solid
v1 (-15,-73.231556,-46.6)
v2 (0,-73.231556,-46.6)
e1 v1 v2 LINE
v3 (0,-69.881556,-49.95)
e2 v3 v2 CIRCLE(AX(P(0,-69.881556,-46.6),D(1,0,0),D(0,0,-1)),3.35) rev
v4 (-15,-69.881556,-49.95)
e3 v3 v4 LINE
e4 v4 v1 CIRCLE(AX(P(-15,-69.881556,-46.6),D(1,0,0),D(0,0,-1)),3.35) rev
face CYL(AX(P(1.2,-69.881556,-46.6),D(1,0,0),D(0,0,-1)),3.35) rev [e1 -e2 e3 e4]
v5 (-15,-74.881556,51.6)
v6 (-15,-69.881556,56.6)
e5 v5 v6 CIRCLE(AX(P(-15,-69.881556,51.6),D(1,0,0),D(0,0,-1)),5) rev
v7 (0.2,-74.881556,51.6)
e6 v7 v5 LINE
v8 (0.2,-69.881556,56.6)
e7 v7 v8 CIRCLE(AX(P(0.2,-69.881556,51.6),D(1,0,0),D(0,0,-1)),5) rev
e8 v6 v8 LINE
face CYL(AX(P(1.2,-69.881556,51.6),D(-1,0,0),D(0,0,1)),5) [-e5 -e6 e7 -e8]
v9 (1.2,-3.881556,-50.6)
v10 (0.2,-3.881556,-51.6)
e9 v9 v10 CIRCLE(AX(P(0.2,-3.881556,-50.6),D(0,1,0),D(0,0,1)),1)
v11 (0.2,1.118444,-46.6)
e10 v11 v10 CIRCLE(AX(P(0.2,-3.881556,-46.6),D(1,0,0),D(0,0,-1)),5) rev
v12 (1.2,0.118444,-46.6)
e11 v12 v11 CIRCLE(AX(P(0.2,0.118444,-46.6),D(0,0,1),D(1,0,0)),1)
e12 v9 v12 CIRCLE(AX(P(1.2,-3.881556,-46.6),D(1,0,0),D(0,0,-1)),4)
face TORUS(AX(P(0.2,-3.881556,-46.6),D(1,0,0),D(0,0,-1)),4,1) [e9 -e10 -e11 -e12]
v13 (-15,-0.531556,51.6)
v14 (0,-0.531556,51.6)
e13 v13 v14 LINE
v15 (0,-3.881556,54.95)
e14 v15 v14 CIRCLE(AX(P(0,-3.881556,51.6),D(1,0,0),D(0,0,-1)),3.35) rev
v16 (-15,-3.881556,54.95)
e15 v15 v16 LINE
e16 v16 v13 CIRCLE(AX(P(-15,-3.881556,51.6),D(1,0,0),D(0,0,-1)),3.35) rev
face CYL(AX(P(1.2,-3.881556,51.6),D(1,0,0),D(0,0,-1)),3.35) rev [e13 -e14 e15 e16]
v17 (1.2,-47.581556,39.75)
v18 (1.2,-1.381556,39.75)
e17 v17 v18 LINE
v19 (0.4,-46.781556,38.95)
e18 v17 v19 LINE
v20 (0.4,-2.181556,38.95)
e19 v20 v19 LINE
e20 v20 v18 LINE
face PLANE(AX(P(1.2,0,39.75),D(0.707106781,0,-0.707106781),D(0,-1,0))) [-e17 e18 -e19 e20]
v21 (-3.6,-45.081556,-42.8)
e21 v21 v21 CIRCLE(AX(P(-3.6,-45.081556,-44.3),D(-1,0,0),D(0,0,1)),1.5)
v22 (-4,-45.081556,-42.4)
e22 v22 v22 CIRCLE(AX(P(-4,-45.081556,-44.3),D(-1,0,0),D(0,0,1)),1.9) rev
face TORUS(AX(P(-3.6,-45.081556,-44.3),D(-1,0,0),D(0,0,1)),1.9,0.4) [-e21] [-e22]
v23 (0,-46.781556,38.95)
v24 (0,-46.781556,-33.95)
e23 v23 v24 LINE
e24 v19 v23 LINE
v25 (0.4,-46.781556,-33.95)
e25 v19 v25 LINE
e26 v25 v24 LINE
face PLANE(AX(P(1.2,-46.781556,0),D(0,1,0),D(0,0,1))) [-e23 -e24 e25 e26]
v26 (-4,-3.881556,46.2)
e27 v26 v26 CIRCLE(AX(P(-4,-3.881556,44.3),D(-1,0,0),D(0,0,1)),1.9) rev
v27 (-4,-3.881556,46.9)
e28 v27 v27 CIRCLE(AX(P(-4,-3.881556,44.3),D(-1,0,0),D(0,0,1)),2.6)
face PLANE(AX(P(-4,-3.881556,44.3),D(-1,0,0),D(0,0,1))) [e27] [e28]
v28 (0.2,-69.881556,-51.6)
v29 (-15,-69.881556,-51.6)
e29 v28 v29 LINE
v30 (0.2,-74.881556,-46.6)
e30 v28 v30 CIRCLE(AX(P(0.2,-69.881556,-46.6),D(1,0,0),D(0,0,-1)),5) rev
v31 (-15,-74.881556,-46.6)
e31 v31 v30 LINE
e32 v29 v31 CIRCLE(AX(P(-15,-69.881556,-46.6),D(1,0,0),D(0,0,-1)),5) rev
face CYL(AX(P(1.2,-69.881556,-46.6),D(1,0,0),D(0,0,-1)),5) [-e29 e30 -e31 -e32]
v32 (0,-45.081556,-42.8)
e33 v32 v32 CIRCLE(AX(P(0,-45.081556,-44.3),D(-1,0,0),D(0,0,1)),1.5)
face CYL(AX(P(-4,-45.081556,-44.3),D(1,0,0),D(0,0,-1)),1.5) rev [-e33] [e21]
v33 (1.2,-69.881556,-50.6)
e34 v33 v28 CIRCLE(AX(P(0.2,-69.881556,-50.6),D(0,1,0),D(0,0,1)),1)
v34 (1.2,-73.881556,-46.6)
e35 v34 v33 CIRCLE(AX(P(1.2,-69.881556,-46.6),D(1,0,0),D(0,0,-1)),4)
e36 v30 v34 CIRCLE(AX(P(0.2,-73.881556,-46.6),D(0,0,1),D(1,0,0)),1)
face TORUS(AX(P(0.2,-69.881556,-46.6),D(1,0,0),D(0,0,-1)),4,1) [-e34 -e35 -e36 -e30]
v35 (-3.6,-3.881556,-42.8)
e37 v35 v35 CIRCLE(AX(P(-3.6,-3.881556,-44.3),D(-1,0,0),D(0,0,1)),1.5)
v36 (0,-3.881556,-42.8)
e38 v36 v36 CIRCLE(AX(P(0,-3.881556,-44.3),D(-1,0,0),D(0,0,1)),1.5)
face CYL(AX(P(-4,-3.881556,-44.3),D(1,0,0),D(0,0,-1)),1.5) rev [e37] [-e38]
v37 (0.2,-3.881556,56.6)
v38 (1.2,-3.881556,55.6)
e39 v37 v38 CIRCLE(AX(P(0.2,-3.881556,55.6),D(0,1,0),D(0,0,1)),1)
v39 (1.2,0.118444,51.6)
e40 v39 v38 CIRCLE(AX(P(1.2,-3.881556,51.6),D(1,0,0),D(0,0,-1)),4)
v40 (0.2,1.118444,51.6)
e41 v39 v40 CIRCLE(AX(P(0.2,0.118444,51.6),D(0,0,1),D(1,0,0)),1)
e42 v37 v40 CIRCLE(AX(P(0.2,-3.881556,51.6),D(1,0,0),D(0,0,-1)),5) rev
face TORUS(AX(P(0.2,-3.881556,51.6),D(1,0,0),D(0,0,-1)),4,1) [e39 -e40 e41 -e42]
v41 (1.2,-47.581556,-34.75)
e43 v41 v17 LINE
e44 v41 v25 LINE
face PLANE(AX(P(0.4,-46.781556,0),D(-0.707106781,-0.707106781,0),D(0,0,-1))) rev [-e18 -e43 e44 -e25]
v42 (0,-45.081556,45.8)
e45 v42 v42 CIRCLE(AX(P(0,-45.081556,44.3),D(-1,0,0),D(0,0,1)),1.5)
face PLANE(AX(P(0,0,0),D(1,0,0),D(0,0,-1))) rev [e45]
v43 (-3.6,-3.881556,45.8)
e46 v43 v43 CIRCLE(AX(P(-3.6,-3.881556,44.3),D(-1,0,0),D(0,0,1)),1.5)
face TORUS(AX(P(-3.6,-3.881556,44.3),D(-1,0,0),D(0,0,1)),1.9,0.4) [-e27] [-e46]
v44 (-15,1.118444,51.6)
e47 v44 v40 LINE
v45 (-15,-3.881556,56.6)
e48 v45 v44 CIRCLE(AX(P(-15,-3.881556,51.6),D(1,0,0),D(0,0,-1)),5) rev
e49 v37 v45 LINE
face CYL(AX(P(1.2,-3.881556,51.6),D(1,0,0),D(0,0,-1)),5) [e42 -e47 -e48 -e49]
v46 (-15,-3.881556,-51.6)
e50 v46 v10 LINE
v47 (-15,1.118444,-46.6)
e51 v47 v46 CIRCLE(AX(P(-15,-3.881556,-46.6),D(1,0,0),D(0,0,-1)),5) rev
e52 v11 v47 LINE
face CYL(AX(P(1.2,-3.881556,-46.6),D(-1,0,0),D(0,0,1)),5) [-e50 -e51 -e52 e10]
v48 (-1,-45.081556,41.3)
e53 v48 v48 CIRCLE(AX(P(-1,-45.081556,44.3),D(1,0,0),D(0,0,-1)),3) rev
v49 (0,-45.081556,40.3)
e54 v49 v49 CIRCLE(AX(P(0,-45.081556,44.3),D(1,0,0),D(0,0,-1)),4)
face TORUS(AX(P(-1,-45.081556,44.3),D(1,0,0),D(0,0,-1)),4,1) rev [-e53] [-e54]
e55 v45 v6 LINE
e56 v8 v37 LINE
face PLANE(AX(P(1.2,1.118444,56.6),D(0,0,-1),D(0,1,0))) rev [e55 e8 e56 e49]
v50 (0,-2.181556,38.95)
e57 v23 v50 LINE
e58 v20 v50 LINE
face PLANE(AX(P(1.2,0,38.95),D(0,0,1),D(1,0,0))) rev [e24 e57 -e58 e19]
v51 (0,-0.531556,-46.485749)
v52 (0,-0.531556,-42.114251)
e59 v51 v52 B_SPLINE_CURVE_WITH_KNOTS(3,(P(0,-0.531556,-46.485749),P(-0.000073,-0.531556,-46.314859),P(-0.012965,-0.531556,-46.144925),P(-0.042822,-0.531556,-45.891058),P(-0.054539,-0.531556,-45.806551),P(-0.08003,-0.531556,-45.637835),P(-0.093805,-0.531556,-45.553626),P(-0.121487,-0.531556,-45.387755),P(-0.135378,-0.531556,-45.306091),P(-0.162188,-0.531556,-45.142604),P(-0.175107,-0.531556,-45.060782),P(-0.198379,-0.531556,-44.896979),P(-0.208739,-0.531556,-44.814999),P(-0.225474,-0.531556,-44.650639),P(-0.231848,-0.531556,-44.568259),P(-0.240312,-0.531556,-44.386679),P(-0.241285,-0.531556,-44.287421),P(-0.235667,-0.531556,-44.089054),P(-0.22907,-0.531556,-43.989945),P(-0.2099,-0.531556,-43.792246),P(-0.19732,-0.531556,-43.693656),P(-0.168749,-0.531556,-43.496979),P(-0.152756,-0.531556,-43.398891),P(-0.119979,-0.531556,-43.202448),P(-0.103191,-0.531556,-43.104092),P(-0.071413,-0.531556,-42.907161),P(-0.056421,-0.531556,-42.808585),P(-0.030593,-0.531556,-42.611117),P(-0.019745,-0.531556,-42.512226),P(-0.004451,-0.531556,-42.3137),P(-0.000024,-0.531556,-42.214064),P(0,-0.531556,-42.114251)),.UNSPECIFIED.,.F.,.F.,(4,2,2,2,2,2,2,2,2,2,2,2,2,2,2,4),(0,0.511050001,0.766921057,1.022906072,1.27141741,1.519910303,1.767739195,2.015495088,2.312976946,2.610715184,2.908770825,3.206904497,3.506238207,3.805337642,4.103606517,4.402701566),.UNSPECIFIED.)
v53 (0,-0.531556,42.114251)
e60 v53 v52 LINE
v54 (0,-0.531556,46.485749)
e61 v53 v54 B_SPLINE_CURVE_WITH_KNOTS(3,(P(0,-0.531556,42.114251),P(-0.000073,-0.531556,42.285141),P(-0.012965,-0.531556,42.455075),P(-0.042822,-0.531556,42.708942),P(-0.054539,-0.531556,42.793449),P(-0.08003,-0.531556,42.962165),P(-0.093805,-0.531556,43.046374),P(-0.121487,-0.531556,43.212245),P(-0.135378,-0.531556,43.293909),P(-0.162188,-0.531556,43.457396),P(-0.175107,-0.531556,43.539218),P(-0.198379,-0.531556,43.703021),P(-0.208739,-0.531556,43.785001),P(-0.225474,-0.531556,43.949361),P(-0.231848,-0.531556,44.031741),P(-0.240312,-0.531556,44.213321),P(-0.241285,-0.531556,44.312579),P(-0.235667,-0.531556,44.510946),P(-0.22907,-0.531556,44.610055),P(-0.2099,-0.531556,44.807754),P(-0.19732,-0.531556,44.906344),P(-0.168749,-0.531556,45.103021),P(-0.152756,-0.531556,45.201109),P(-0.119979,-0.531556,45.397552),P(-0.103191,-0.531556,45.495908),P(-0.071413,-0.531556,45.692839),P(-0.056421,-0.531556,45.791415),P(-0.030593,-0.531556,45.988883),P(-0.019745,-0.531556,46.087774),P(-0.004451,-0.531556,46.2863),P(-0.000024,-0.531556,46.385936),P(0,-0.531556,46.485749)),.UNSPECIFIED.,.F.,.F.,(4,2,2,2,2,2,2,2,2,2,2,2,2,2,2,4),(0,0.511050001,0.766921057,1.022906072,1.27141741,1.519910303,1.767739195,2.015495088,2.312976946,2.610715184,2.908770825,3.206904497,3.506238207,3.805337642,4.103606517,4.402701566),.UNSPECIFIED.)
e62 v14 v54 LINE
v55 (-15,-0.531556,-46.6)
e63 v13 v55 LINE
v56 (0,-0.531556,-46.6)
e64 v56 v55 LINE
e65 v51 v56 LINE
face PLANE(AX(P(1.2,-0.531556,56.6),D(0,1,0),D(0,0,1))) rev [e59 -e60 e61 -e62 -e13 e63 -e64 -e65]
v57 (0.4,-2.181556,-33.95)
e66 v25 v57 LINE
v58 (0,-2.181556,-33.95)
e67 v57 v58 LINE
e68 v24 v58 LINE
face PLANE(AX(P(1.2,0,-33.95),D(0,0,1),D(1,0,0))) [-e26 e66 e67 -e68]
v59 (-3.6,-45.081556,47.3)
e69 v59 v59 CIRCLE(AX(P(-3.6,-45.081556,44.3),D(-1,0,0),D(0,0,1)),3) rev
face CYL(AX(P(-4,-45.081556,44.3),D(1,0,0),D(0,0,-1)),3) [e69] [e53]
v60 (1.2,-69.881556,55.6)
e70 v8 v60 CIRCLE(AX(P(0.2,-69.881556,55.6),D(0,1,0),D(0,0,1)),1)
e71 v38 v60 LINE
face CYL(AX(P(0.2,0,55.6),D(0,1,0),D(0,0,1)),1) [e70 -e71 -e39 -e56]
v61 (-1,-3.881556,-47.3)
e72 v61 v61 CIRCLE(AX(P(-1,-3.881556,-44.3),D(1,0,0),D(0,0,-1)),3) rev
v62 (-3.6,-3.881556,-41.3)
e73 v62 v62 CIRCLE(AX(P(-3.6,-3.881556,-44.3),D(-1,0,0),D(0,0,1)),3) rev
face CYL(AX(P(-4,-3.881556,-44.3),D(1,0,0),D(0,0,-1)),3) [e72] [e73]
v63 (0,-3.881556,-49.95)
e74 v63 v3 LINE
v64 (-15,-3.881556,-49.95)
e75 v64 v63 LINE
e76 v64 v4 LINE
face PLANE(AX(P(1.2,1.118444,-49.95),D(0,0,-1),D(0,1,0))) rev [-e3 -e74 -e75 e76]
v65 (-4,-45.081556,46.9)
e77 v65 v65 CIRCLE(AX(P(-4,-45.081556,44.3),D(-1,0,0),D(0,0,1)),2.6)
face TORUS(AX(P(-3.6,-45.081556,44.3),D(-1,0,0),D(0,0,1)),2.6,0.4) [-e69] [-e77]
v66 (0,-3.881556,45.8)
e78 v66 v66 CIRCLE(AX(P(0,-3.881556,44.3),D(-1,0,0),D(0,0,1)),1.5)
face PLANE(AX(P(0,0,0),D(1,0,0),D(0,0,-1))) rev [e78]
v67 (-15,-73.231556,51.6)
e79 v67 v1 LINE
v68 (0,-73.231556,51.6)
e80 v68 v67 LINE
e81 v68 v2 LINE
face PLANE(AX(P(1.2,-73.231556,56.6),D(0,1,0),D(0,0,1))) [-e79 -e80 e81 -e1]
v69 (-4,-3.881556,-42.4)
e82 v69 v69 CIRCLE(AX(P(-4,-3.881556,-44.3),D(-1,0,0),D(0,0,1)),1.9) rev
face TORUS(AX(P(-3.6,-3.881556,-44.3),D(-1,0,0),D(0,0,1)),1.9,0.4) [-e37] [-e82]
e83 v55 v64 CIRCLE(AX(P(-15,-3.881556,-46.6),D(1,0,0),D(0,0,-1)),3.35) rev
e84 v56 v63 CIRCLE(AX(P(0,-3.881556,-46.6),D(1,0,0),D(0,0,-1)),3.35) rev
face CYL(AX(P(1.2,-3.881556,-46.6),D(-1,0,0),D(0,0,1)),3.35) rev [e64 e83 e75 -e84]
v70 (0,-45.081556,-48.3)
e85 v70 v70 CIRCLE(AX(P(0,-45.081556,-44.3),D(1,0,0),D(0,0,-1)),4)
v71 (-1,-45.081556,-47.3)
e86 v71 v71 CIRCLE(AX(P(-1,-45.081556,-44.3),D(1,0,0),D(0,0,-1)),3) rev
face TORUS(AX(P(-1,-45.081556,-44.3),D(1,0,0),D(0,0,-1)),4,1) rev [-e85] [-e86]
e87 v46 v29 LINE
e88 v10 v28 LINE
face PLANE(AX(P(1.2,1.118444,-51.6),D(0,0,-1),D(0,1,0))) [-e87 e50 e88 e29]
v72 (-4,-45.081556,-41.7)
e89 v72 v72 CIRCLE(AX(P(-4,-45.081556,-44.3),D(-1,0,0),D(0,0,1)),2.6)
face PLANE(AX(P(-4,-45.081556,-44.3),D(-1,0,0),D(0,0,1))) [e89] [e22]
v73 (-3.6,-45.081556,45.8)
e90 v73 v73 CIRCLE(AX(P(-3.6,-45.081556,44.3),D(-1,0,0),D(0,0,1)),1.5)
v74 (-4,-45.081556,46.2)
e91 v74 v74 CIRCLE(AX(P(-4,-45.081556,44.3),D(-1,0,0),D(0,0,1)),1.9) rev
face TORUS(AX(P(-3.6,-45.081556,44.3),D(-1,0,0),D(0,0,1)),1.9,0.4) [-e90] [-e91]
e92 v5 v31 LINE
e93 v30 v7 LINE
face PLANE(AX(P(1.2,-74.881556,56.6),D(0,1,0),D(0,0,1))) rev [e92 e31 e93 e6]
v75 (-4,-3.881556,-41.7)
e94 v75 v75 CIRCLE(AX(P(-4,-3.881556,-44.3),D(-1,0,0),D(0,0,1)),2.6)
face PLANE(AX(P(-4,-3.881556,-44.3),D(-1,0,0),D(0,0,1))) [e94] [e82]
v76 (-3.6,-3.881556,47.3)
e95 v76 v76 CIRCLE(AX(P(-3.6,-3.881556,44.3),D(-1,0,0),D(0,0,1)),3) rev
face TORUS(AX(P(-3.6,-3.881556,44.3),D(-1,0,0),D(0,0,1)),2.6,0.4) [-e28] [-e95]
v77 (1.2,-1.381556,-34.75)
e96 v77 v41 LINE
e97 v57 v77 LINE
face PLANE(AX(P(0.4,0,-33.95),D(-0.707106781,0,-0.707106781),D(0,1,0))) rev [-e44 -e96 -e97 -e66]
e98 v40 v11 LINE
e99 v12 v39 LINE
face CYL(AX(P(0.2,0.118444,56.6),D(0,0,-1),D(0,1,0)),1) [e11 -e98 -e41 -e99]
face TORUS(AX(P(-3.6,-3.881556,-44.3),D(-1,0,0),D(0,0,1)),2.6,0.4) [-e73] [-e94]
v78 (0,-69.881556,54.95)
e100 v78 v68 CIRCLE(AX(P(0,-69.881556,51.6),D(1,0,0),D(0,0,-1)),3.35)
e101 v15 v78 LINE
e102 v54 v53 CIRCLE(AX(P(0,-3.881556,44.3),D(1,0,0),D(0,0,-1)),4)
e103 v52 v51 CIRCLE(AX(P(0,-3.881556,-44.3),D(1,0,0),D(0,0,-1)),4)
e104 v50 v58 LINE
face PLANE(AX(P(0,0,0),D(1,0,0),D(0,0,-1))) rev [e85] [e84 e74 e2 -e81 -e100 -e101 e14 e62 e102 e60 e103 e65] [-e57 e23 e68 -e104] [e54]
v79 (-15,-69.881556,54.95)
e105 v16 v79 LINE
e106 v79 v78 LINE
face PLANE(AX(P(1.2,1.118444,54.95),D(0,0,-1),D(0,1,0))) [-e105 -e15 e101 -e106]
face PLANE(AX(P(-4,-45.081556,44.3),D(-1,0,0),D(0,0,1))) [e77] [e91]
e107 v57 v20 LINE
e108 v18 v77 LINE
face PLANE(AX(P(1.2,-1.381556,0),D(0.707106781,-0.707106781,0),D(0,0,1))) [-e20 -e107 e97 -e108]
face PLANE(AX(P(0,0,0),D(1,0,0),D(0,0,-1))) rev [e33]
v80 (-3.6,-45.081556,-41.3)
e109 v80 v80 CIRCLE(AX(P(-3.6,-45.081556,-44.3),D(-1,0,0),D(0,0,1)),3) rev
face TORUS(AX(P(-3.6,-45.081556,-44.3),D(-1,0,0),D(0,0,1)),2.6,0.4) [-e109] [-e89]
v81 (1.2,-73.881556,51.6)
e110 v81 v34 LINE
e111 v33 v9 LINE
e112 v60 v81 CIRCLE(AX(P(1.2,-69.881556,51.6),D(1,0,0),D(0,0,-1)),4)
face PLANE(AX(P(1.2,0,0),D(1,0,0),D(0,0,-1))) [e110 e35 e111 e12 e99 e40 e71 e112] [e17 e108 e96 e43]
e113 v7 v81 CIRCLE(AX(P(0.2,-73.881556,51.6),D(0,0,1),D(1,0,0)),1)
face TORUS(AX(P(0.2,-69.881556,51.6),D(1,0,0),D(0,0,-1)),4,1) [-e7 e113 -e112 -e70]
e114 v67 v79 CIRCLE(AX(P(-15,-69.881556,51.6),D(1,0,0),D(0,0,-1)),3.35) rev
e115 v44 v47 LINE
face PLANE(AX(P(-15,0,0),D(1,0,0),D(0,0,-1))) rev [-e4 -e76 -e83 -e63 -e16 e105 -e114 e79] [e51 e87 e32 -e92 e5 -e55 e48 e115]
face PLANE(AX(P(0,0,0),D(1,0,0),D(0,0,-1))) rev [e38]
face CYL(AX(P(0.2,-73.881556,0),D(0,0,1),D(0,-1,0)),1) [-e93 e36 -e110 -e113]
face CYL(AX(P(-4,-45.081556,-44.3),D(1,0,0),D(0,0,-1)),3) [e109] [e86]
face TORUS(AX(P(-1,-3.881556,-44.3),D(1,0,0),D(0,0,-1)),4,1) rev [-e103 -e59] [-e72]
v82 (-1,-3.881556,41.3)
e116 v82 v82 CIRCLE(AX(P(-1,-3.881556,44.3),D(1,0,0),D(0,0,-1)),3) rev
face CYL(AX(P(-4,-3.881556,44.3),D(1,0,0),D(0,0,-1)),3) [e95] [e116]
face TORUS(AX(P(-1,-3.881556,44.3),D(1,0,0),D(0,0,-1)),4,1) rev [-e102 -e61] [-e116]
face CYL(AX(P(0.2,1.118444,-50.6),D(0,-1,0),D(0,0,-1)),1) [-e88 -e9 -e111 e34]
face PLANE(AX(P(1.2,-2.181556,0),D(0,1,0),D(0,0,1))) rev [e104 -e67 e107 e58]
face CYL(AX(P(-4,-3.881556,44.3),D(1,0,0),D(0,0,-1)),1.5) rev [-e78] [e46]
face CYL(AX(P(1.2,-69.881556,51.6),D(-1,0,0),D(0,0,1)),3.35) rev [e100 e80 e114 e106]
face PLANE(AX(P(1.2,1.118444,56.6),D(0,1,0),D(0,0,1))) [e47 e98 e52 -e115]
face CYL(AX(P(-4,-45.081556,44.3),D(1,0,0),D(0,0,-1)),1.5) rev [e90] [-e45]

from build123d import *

# Parameters (mm, degrees)
BOSS_EXTRUDE1_DEPTH      = 1.2
BOSS_EXTRUDE1_DEPTH_BACK = 15
SKETCH2_W                = 76
SKETCH2_H                = 108.2
FILLET1_R                = 5
FILLET2_R                = 1
SHELL1_T                 = -1.65
SHELL1_THICKNESS_2_DEPTH = 0.45
SKETCH2_3_W              = 44.6
SKETCH2_3_H              = 72.9
CUT_EXTRUDE1_DEPTH       = 96.056864098
CHAMFER1_SIZE            = 0.8
SKETCH3_R                = 3
SKETCH3_R_2              = 1.5
BOSS_EXTRUDE2_DEPTH      = 4
FILLET3_R                = 1
FILLET4_R                = 0.4


with BuildPart() as part:
    # Sketch2 → Boss-Extrude1 (new, two sides: drawn at the far end of the back side and taken through both)
    with BuildSketch(Plane.YZ.offset(-BOSS_EXTRUDE1_DEPTH_BACK)):
        with Locations((-36.881555812, 2.5)):
            Rectangle(SKETCH2_W, SKETCH2_H)
    extrude(amount=BOSS_EXTRUDE1_DEPTH + BOSS_EXTRUDE1_DEPTH_BACK)

    # Fillet1
    fillet1_edges = [part.edges().sort_by_distance(p)[0] for p in [
        (-6.9, 1.118444188, -51.6),
        (-6.9, 1.118444188, 56.6),
        (-6.9, -74.881555812, 56.6),
        (-6.9, -74.881555812, -51.6),
    ]]
    fillet(fillet1_edges, radius=FILLET1_R)

    # Fillet2
    fillet2_edges = [part.edges().sort_by_distance(p)[0] for p in [
        (1.2, -74.881555812, 2.5),
        (1.2, -36.881555812, 56.6),
        (1.2, -36.881555812, -51.6),
        (1.2, 1.118444188, 2.5),
        (1.2, -0.346021906, 55.135533906),
        (1.2, -0.346021906, -50.135533906),
        (1.2, -73.417089718, -50.135533906),
        (1.2, -73.417089718, 55.135533906),
    ]]
    fillet(fillet2_edges, radius=FILLET2_R)

    # Shell1
    shell1_openings = [part.faces().sort_by_distance(p)[0] for p in [
        (-15, -36.881555812, 2.5),
    ]]
    offset(amount=SHELL1_T, openings=shell1_openings, kind=Kind.INTERSECTION)

    # Shell1 thickness 2 face (on inner face of the shell) → Shell1 thickness 2 (cut)
    with BuildSketch(Plane(origin=(-0.45, -36.881555812, 2.5), x_dir=(0, 0, 1), z_dir=(1, 0, 0))):
        with BuildLine():
            ThreePointArc((52.45, -33), (51.468807717, -35.368807717), (49.1, -36.35))
            Line((49.1, -36.35), (-49.1, -36.35))
            ThreePointArc((-49.1, -36.35), (-51.468807717, -35.368807717), (-52.45, -33))
            Line((-52.45, -33), (-52.45, 33))
            ThreePointArc((-52.45, 33), (-51.468807717, 35.368807717), (-49.1, 36.35))
            Line((-49.1, 36.35), (49.1, 36.35))
            ThreePointArc((49.1, 36.35), (51.468807717, 35.368807717), (52.45, 33))
            Line((52.45, 33), (52.45, -33))
        make_face()
    extrude(amount=SHELL1_THICKNESS_2_DEPTH, mode=Mode.SUBTRACT)

    # Sketch2<3> → Cut-Extrude1 (cut, through all)
    with BuildSketch(Plane.YZ):
        with Locations((-24.481555812, 2.5)):
            Rectangle(SKETCH2_3_W, SKETCH2_3_H)
    extrude(amount=CUT_EXTRUDE1_DEPTH, mode=Mode.SUBTRACT)

    # Chamfer1
    chamfer1_edges = [part.edges().sort_by_distance(p)[0] for p in [
        (1.2, -2.181555812, 2.5),
        (1.2, -24.481555812, 38.95),
        (1.2, -46.781555812, 2.5),
        (1.2, -24.481555812, -33.95),
    ]]
    chamfer(chamfer1_edges, length=CHAMFER1_SIZE)

    # Sketch3 → Boss-Extrude2 (add)
    # profile 1 of 4: a face of its own
    with BuildSketch(Plane(origin=(0, 0, 0), x_dir=(0, -1, 0), z_dir=(-1, 0, 0))):
        with Locations(Location((3.881555812, 44.3, 0), (0, 0, 270))):
            Circle(SKETCH3_R)
        with Locations(Location((3.881555812, 44.3, 0), (0, 0, 90))):
            Circle(SKETCH3_R_2, mode=Mode.SUBTRACT)
    # profile 2 of 4: a face of its own
    with BuildSketch(Plane(origin=(0, 0, 0), x_dir=(0, -1, 0), z_dir=(-1, 0, 0))):
        with Locations(Location((45.081555812, 44.3, 0), (0, 0, 270))):
            Circle(SKETCH3_R)
        with Locations(Location((45.081555812, 44.3, 0), (0, 0, 90))):
            Circle(SKETCH3_R_2, mode=Mode.SUBTRACT)
    # profile 3 of 4: a face of its own
    with BuildSketch(Plane(origin=(0, 0, 0), x_dir=(0, -1, 0), z_dir=(-1, 0, 0))):
        with Locations(Location((45.081555812, -44.3, 0), (0, 0, 270))):
            Circle(SKETCH3_R)
        with Locations(Location((45.081555812, -44.3, 0), (0, 0, 90))):
            Circle(SKETCH3_R_2, mode=Mode.SUBTRACT)
    # profile 4 of 4: a face of its own
    with BuildSketch(Plane(origin=(0, 0, 0), x_dir=(0, -1, 0), z_dir=(-1, 0, 0))):
        with Locations(Location((3.881555812, -44.3, 0), (0, 0, 270))):
            Circle(SKETCH3_R)
        with Locations(Location((3.881555812, -44.3, 0), (0, 0, 90))):
            Circle(SKETCH3_R_2, mode=Mode.SUBTRACT)
    extrude(amount=BOSS_EXTRUDE2_DEPTH)

    # Fillet3
    # the kernel refuses this fillet: 1 mm, written as the material it adds along each edge
    with BuildSketch(Plane(origin=(0, -3.881555812, 44.3), x_dir=(0, 0, -1), z_dir=(0, 1, 0))) as fillet3_piece_1:
        with BuildLine():
            CenterArc((3 + FILLET3_R, FILLET3_R), FILLET3_R, 180, 90)
            Line((3, FILLET3_R), (3, 0))
            Line((3, 0), (3 + FILLET3_R, 0))
        make_face()
    revolve(axis=Axis((0, -3.881555812, 44.3), (-1, 0, 0)))
    with BuildSketch(Plane(origin=(0, -45.081555812, -44.3), x_dir=(0, 0, -1), z_dir=(0, 1, 0))) as fillet3_piece_2:
        with BuildLine():
            CenterArc((3 + FILLET3_R, FILLET3_R), FILLET3_R, 180, 90)
            Line((3, FILLET3_R), (3, 0))
            Line((3, 0), (3 + FILLET3_R, 0))
        make_face()
    revolve(axis=Axis((0, -45.081555812, -44.3), (-1, 0, 0)))
    with BuildSketch(Plane(origin=(0, -3.881555812, -44.3), x_dir=(0, 0, -1), z_dir=(0, 1, 0))) as fillet3_piece_3:
        with BuildLine():
            CenterArc((3 + FILLET3_R, FILLET3_R), FILLET3_R, 180, 90)
            Line((3, FILLET3_R), (3, 0))
            Line((3, 0), (3 + FILLET3_R, 0))
        make_face()
    revolve(axis=Axis((0, -3.881555812, -44.3), (-1, 0, 0)))
    with BuildSketch(Plane(origin=(0, -45.081555812, 44.3), x_dir=(0, 0, -1), z_dir=(0, 1, 0))) as fillet3_piece_4:
        with BuildLine():
            CenterArc((3 + FILLET3_R, FILLET3_R), FILLET3_R, 180, 90)
            Line((3, FILLET3_R), (3, 0))
            Line((3, 0), (3 + FILLET3_R, 0))
        make_face()
    revolve(axis=Axis((0, -45.081555812, 44.3), (-1, 0, 0)))

    # Fillet4
    fillet4_edges = [part.edges().sort_by_distance(p)[0] for p in [
        (-4, -45.081555812, 47.3),
        (-4, -45.081555812, 42.8),
        (-4, -3.881555812, -41.3),
        (-4, -3.881555812, -45.8),
        (-4, -45.081555812, -41.3),
        (-4, -45.081555812, -45.8),
        (-4, -3.881555812, 47.3),
        (-4, -3.881555812, 42.8),
    ]]
    fillet(fillet4_edges, radius=FILLET4_R)


solid = part.part
